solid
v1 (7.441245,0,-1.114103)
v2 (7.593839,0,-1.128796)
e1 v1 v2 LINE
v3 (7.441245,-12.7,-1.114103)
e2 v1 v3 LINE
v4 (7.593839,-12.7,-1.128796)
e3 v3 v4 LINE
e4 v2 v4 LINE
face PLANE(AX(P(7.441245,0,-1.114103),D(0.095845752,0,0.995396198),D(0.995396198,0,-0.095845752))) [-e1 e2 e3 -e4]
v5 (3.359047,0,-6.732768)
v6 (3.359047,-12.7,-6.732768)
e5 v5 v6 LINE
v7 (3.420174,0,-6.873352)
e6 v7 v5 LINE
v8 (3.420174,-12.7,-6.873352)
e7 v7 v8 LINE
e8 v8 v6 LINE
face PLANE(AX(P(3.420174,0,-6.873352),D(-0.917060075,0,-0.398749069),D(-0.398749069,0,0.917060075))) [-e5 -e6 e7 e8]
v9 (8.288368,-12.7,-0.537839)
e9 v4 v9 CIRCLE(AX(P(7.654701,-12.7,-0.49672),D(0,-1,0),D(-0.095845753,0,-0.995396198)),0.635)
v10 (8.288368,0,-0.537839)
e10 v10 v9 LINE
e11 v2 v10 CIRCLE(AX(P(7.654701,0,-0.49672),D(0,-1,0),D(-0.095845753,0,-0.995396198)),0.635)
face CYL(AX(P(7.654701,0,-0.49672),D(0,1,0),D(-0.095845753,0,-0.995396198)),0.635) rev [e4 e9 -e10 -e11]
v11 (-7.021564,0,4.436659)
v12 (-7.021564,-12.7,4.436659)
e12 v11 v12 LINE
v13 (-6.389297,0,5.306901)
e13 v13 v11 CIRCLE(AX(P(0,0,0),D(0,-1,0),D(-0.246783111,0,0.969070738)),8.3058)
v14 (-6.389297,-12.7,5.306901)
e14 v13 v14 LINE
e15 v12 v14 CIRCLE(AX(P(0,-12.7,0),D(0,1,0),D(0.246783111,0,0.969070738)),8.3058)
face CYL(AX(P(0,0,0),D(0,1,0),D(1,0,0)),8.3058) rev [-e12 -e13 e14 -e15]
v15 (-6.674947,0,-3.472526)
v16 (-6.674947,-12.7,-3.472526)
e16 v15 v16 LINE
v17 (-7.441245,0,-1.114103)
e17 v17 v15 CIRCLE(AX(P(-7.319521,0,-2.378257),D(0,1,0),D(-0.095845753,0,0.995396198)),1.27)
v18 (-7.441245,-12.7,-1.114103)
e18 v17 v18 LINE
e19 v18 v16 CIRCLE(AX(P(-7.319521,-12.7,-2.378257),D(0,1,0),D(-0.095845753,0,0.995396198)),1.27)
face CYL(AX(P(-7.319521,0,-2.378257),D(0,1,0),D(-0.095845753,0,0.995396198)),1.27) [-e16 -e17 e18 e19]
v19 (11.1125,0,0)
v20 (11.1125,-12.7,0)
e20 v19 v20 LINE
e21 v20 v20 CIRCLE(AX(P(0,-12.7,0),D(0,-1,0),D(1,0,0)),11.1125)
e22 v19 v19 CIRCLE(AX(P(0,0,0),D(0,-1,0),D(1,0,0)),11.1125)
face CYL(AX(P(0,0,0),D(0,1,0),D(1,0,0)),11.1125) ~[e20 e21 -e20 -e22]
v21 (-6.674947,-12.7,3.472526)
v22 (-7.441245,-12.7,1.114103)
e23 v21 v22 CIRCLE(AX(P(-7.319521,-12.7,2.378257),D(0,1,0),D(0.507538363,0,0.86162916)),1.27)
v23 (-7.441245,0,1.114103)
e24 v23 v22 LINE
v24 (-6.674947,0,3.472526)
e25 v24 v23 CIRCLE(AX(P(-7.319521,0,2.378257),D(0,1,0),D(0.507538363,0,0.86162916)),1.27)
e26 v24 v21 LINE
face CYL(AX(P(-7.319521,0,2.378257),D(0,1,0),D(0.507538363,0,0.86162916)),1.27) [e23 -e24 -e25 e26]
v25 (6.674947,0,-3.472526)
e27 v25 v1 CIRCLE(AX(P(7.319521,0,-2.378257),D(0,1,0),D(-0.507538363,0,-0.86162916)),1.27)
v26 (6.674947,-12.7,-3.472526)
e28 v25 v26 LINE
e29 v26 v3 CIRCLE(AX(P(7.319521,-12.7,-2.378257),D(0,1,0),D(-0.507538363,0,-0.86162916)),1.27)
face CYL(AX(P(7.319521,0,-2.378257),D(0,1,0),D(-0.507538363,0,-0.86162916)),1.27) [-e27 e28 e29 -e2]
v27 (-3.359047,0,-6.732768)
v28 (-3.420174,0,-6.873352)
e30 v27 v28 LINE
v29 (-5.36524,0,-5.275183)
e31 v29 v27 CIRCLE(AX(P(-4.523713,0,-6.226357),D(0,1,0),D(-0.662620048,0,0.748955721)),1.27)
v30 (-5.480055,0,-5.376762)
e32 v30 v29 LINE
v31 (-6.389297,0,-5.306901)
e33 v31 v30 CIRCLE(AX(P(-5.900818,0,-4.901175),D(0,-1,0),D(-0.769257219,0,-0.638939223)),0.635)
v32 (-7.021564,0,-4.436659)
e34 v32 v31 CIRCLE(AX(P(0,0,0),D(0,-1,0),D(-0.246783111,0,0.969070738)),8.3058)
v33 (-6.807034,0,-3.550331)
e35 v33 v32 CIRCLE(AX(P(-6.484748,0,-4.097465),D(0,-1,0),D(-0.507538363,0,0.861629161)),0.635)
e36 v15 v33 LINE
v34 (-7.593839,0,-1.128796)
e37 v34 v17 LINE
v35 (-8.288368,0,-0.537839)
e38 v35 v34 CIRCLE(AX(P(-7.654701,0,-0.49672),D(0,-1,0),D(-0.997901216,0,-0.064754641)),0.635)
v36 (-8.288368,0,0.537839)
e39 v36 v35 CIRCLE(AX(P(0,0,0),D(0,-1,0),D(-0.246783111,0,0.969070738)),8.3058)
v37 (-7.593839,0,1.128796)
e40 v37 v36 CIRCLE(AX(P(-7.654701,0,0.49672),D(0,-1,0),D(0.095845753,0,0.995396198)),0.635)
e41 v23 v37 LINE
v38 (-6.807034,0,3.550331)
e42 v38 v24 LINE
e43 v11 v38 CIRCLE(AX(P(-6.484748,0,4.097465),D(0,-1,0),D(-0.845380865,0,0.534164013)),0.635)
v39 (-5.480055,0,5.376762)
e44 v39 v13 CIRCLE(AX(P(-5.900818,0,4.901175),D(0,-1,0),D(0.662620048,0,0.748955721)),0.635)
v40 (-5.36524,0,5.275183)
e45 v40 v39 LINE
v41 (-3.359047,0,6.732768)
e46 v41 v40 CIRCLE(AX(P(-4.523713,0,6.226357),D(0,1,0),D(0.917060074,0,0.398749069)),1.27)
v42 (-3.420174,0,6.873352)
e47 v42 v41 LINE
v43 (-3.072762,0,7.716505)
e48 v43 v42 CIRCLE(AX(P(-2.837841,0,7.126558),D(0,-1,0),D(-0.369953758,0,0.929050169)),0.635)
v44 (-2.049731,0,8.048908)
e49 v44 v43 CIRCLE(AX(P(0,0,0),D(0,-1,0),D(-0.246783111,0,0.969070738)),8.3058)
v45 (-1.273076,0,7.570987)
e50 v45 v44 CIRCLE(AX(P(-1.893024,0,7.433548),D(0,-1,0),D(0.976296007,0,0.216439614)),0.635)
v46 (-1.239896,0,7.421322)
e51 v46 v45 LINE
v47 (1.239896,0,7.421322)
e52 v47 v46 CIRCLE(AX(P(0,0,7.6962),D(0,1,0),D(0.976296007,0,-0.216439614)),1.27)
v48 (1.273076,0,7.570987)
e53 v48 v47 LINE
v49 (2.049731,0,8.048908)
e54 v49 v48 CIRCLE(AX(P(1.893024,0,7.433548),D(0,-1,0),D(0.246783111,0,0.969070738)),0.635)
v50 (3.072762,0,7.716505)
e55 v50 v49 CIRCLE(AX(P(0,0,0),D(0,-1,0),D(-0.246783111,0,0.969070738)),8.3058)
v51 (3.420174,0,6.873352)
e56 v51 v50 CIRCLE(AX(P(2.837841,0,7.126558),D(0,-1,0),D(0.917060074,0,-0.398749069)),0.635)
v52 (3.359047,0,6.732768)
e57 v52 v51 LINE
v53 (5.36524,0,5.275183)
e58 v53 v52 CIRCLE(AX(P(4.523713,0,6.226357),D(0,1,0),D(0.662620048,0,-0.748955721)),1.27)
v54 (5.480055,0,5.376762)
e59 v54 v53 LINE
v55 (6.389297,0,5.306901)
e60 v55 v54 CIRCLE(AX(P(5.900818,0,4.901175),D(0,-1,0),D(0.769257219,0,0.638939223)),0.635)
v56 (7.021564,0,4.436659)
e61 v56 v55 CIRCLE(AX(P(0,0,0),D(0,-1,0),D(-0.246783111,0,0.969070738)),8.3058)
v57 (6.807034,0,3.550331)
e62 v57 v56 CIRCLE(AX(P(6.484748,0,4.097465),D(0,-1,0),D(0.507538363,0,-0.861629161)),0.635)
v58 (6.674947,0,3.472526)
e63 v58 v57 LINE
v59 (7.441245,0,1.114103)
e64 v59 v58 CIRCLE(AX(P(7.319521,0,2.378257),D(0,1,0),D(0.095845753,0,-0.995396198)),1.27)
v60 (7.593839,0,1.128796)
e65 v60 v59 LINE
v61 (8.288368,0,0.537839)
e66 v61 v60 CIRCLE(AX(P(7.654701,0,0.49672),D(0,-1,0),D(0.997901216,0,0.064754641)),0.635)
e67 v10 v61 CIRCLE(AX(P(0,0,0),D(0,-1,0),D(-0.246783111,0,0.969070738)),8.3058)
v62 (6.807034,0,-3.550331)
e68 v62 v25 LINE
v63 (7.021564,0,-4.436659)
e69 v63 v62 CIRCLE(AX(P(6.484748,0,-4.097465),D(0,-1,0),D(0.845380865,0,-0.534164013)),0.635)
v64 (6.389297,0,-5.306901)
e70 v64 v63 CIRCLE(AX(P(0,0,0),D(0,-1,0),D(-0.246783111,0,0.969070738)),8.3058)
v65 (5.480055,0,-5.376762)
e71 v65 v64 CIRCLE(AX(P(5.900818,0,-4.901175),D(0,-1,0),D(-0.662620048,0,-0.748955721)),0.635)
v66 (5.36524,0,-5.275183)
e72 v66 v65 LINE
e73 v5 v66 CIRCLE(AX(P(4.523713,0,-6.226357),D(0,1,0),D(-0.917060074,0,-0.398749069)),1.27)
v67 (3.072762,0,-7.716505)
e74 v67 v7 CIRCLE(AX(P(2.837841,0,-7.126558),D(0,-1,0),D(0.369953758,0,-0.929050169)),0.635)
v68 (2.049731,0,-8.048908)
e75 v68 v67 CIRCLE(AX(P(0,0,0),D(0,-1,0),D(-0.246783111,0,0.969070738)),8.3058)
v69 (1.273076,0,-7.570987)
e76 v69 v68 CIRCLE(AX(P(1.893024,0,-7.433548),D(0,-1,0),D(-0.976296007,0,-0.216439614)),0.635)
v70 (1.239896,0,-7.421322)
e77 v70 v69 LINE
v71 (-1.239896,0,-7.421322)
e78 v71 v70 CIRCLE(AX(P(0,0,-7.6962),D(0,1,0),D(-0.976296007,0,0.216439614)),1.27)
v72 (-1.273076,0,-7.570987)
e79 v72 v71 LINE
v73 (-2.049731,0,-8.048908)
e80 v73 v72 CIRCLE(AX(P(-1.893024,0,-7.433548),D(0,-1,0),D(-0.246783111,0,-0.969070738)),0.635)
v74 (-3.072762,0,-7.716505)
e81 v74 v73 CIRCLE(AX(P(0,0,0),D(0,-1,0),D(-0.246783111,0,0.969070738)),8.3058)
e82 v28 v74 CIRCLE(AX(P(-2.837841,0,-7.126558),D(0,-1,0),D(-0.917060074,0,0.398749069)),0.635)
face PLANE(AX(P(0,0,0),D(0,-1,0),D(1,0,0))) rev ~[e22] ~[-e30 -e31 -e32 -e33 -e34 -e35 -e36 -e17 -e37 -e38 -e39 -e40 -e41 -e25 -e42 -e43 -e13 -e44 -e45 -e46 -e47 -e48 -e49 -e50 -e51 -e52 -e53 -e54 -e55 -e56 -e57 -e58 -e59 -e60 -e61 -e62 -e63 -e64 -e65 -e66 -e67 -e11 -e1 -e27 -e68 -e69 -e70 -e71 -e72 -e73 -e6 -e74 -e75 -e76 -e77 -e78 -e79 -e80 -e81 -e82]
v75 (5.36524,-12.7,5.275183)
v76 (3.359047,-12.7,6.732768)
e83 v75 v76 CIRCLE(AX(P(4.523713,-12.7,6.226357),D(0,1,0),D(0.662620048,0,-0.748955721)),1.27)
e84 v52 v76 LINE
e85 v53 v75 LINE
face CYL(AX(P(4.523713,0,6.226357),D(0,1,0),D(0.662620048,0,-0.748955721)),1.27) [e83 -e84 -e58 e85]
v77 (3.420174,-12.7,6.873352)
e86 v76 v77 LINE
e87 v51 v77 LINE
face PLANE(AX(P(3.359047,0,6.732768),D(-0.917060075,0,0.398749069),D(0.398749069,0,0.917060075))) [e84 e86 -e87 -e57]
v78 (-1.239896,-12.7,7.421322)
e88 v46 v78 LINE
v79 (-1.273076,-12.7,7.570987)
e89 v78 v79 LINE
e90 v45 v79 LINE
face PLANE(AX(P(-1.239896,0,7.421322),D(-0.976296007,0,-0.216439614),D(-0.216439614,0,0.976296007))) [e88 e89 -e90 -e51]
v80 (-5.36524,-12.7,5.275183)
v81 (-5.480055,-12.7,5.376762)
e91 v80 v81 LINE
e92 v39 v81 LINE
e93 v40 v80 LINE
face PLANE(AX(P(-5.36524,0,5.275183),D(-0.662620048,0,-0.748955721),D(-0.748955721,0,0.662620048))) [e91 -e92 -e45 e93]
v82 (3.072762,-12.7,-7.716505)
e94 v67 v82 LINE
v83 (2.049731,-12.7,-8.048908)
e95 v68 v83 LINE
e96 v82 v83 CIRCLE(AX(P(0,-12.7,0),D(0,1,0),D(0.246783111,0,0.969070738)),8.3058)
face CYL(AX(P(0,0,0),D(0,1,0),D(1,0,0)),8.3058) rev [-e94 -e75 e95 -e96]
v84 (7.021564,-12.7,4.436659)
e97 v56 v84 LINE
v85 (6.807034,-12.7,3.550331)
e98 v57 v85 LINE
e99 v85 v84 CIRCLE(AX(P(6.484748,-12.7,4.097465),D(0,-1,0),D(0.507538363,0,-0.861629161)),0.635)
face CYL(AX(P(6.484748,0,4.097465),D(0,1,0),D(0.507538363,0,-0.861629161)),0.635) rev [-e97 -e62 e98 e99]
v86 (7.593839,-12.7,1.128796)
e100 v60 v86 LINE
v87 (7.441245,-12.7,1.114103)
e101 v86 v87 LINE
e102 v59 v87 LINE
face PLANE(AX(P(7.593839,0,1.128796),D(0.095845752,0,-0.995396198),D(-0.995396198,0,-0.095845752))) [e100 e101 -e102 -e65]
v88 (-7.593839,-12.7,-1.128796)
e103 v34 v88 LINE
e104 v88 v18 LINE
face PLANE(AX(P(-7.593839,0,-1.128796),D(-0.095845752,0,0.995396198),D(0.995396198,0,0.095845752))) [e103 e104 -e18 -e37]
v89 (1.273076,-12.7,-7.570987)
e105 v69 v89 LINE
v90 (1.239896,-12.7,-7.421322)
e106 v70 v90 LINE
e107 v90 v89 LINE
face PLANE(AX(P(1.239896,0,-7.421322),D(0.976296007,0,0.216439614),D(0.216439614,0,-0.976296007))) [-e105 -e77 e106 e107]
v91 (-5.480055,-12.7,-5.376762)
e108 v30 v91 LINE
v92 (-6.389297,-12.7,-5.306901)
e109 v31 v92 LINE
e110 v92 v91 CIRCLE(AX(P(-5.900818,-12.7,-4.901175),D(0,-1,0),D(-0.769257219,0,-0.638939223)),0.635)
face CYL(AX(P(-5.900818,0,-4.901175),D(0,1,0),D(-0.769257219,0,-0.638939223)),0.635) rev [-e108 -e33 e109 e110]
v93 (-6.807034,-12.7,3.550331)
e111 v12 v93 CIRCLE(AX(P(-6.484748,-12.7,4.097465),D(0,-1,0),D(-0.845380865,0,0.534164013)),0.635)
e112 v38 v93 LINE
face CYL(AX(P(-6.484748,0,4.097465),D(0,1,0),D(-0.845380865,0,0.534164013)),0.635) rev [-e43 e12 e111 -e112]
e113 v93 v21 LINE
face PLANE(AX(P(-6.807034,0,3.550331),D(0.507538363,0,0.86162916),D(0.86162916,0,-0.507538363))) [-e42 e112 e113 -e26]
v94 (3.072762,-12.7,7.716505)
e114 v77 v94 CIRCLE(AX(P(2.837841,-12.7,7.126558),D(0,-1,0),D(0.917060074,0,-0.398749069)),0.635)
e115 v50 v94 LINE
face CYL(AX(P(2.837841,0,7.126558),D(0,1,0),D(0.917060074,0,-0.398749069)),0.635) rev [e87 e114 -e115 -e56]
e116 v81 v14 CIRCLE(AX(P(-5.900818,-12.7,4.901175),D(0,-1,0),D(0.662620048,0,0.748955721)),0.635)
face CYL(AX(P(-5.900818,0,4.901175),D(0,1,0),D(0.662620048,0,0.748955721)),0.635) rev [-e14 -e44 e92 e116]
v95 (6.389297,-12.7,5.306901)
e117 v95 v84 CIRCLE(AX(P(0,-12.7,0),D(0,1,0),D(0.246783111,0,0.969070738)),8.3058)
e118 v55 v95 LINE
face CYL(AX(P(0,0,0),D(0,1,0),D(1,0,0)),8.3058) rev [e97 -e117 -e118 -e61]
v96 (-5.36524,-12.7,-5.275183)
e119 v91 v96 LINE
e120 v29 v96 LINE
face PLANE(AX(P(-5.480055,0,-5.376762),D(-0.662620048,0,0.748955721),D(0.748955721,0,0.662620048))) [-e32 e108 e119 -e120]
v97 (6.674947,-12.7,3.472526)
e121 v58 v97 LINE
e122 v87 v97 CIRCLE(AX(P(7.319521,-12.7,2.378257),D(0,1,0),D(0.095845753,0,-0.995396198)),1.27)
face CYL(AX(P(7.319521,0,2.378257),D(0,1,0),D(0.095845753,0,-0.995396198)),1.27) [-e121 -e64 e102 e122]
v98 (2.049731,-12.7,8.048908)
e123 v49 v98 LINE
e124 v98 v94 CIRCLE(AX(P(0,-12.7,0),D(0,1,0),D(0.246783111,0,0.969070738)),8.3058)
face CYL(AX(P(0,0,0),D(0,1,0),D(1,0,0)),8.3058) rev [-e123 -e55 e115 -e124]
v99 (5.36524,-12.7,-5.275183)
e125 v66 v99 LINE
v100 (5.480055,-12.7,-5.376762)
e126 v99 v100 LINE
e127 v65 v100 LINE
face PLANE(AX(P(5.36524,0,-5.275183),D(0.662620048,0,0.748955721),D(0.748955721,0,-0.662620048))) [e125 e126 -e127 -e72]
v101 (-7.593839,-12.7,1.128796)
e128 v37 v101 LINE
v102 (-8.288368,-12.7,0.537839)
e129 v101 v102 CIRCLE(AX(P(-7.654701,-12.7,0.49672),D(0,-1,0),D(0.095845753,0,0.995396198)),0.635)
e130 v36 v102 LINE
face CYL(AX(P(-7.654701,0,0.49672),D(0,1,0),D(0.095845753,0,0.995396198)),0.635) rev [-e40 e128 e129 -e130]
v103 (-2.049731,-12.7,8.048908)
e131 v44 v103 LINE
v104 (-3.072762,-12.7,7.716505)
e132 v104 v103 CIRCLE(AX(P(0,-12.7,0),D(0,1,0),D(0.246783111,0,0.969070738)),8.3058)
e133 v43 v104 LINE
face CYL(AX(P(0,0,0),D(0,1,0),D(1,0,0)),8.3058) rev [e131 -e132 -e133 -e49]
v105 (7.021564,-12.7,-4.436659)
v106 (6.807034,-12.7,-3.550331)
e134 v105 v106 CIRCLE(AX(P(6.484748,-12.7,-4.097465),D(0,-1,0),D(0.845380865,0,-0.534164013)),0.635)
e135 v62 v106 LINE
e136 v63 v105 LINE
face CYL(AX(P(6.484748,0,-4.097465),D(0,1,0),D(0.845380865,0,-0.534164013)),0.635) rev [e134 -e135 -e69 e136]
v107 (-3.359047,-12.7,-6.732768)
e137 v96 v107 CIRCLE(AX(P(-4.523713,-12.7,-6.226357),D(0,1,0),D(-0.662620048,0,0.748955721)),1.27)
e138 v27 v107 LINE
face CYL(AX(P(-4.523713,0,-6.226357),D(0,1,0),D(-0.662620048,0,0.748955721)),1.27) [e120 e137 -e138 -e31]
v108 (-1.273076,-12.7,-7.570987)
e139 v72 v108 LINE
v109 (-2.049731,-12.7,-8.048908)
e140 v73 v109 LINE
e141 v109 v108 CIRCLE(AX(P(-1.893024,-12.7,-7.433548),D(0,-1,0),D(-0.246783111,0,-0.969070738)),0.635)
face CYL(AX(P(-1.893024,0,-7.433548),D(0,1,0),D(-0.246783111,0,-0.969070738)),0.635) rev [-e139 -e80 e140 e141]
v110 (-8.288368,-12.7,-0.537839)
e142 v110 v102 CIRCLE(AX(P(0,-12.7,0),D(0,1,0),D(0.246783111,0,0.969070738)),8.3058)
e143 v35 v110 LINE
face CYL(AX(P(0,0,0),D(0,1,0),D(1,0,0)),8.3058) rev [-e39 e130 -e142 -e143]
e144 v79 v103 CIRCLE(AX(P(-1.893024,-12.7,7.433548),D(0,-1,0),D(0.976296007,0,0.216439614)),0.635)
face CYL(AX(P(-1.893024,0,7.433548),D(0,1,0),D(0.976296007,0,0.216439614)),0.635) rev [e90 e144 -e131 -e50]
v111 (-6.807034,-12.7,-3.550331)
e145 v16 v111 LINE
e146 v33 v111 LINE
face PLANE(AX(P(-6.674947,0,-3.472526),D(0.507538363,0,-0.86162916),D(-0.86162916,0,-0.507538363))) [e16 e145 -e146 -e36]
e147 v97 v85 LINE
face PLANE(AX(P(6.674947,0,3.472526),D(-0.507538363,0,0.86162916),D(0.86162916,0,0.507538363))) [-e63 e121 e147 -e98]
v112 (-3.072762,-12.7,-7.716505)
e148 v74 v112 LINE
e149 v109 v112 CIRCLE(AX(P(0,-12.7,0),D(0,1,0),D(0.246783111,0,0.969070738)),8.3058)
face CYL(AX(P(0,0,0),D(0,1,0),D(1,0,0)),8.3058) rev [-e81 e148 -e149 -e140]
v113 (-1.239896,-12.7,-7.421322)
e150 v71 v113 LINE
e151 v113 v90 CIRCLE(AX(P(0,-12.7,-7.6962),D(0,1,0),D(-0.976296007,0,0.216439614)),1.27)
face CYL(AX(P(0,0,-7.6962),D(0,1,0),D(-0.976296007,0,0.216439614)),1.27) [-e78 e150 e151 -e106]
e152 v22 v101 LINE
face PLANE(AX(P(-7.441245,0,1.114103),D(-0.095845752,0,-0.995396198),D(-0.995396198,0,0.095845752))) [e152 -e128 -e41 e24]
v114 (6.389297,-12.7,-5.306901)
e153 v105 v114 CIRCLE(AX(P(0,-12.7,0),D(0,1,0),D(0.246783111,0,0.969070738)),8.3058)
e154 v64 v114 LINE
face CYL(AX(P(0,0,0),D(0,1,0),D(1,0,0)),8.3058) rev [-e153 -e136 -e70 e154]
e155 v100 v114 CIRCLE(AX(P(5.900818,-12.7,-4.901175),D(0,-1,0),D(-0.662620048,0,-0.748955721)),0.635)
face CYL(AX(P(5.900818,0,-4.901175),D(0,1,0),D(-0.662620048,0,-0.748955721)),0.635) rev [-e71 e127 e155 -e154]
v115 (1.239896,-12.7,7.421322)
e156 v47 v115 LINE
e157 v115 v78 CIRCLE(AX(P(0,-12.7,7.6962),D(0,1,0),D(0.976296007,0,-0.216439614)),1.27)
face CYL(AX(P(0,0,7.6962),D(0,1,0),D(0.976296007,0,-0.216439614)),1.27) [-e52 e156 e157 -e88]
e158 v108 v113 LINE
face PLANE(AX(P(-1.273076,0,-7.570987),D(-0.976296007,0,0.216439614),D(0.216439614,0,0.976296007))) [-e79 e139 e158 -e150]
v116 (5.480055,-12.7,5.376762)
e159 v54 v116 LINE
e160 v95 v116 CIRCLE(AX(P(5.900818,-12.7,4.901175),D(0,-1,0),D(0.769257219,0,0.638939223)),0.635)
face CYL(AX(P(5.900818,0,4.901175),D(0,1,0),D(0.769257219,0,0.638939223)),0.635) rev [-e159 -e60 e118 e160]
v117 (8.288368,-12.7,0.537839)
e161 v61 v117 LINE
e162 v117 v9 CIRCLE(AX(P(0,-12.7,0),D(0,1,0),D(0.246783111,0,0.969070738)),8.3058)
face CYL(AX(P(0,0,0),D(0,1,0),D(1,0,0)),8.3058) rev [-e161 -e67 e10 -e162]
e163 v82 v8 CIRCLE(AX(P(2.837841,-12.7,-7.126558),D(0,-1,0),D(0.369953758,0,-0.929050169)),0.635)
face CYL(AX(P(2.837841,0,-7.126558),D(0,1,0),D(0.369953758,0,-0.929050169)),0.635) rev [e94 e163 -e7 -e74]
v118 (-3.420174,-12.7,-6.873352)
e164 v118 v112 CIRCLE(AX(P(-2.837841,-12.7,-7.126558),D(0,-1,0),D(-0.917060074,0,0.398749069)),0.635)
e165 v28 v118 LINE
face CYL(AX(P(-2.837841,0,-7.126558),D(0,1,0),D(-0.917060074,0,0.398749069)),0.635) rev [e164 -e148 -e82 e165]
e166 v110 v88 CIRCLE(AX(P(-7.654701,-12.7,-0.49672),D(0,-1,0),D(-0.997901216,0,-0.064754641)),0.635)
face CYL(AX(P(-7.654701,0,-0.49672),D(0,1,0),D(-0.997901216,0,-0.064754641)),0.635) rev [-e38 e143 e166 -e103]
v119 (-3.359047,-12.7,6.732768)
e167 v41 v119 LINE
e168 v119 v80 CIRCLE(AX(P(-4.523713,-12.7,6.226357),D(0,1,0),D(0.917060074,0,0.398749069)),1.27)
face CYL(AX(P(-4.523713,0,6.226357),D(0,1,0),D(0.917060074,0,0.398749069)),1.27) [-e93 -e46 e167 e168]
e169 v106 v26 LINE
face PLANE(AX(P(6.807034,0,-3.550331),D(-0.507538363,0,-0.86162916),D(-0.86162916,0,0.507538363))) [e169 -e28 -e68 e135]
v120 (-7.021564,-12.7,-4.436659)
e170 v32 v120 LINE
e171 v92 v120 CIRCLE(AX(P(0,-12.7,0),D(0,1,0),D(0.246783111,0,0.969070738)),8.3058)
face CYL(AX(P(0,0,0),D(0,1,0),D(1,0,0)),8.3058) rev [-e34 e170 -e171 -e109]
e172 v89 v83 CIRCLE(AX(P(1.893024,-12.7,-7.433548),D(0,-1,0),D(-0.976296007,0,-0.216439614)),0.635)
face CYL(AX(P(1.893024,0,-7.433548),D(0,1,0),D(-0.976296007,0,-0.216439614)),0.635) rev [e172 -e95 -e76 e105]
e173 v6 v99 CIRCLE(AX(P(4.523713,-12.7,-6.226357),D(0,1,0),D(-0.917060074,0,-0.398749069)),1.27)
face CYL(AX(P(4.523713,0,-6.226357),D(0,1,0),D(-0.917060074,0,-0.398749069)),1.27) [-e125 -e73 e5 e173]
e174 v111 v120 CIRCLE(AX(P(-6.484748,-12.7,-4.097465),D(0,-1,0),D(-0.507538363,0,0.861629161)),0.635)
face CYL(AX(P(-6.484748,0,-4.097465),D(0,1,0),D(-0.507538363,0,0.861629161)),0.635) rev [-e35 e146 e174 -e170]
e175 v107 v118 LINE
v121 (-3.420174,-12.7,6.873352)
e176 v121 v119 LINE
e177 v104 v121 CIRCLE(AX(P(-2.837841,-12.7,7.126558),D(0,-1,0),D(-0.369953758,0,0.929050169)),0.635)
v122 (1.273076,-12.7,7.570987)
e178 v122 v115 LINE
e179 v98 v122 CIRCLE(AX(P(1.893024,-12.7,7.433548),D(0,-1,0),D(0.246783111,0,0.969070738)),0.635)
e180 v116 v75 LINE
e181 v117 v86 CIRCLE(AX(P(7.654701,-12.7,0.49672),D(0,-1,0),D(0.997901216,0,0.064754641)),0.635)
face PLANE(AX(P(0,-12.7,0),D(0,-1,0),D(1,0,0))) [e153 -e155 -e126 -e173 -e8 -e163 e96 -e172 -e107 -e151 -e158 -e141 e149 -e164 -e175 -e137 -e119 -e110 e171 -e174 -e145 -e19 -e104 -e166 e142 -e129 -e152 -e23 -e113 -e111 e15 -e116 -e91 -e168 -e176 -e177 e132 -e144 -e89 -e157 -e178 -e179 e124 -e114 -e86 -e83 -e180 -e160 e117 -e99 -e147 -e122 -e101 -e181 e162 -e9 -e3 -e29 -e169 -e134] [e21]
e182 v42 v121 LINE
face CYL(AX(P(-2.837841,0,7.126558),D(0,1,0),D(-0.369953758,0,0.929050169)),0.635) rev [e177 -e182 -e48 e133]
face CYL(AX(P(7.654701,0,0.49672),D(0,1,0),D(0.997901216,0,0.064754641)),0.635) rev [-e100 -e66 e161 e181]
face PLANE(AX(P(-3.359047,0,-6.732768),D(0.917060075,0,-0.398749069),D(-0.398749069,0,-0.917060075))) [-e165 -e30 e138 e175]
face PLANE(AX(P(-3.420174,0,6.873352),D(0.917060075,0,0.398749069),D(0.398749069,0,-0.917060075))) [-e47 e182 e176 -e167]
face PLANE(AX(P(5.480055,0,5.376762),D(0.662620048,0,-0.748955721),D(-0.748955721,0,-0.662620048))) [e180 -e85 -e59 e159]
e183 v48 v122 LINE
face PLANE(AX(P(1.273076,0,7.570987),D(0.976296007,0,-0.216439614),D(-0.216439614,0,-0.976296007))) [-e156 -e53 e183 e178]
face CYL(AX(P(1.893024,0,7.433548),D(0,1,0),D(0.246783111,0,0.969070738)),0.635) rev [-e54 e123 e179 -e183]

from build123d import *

# Parameters (mm, degrees)
F1_R            = 11.1125
F1_R_2          = 8.3058
F2_DEPTH        = 12.7
F4_DEPTH        = 12.7
F4_COPIES_COUNT = 10


# Not quite as in the source:
# - a pattern or mirror of a feature is missing from the dataset's text; its kind, count and spacing are read off the source's solid


with BuildPart() as f2:
    # F1 (on Front) → F2 (new body)
    with BuildSketch(Plane.XZ):
        Circle(F1_R)
        Circle(F1_R_2, mode=Mode.SUBTRACT)
    extrude(amount=F2_DEPTH)

    # F3 (on face) → F4 (join, through all)
    with BuildSketch(Plane(origin=(0, 0, 0), x_dir=(-1, 0, 0), z_dir=(0, 1, 0))):
        with BuildLine():
            ThreePointArc((-2.0497311639, 8.0489077393), (-1.5602325902, 7.9743573542), (-1.2730759239, 7.5709869752))
            Line((-1.2730759239, 7.5709869752), (-1.239895929, 7.4213216903))
            ThreePointArc((-1.239895929, 7.4213216903), (0, 6.4262), (1.239895929, 7.4213216903))
            Line((1.239895929, 7.4213216903), (1.2730759239, 7.5709869752))
            ThreePointArc((1.2730759239, 7.5709869752), (1.5602325902, 7.9743573542), (2.0497311639, 8.0489077393))
            ThreePointArc((2.0497311639, 8.0489077393), (0, 8.3058), (-2.0497311639, 8.0489077393))
        make_face()
    f4 = extrude(amount=-F4_DEPTH)

    # F4_copies: F4 ×10 about axis
    f4_copies_axis = Axis((0, 0, 0), (0, 1, 0))
    for i in range(1, F4_COPIES_COUNT):
        add(f4.rotate(f4_copies_axis, i * 360 / F4_COPIES_COUNT))


solid = f2.part
